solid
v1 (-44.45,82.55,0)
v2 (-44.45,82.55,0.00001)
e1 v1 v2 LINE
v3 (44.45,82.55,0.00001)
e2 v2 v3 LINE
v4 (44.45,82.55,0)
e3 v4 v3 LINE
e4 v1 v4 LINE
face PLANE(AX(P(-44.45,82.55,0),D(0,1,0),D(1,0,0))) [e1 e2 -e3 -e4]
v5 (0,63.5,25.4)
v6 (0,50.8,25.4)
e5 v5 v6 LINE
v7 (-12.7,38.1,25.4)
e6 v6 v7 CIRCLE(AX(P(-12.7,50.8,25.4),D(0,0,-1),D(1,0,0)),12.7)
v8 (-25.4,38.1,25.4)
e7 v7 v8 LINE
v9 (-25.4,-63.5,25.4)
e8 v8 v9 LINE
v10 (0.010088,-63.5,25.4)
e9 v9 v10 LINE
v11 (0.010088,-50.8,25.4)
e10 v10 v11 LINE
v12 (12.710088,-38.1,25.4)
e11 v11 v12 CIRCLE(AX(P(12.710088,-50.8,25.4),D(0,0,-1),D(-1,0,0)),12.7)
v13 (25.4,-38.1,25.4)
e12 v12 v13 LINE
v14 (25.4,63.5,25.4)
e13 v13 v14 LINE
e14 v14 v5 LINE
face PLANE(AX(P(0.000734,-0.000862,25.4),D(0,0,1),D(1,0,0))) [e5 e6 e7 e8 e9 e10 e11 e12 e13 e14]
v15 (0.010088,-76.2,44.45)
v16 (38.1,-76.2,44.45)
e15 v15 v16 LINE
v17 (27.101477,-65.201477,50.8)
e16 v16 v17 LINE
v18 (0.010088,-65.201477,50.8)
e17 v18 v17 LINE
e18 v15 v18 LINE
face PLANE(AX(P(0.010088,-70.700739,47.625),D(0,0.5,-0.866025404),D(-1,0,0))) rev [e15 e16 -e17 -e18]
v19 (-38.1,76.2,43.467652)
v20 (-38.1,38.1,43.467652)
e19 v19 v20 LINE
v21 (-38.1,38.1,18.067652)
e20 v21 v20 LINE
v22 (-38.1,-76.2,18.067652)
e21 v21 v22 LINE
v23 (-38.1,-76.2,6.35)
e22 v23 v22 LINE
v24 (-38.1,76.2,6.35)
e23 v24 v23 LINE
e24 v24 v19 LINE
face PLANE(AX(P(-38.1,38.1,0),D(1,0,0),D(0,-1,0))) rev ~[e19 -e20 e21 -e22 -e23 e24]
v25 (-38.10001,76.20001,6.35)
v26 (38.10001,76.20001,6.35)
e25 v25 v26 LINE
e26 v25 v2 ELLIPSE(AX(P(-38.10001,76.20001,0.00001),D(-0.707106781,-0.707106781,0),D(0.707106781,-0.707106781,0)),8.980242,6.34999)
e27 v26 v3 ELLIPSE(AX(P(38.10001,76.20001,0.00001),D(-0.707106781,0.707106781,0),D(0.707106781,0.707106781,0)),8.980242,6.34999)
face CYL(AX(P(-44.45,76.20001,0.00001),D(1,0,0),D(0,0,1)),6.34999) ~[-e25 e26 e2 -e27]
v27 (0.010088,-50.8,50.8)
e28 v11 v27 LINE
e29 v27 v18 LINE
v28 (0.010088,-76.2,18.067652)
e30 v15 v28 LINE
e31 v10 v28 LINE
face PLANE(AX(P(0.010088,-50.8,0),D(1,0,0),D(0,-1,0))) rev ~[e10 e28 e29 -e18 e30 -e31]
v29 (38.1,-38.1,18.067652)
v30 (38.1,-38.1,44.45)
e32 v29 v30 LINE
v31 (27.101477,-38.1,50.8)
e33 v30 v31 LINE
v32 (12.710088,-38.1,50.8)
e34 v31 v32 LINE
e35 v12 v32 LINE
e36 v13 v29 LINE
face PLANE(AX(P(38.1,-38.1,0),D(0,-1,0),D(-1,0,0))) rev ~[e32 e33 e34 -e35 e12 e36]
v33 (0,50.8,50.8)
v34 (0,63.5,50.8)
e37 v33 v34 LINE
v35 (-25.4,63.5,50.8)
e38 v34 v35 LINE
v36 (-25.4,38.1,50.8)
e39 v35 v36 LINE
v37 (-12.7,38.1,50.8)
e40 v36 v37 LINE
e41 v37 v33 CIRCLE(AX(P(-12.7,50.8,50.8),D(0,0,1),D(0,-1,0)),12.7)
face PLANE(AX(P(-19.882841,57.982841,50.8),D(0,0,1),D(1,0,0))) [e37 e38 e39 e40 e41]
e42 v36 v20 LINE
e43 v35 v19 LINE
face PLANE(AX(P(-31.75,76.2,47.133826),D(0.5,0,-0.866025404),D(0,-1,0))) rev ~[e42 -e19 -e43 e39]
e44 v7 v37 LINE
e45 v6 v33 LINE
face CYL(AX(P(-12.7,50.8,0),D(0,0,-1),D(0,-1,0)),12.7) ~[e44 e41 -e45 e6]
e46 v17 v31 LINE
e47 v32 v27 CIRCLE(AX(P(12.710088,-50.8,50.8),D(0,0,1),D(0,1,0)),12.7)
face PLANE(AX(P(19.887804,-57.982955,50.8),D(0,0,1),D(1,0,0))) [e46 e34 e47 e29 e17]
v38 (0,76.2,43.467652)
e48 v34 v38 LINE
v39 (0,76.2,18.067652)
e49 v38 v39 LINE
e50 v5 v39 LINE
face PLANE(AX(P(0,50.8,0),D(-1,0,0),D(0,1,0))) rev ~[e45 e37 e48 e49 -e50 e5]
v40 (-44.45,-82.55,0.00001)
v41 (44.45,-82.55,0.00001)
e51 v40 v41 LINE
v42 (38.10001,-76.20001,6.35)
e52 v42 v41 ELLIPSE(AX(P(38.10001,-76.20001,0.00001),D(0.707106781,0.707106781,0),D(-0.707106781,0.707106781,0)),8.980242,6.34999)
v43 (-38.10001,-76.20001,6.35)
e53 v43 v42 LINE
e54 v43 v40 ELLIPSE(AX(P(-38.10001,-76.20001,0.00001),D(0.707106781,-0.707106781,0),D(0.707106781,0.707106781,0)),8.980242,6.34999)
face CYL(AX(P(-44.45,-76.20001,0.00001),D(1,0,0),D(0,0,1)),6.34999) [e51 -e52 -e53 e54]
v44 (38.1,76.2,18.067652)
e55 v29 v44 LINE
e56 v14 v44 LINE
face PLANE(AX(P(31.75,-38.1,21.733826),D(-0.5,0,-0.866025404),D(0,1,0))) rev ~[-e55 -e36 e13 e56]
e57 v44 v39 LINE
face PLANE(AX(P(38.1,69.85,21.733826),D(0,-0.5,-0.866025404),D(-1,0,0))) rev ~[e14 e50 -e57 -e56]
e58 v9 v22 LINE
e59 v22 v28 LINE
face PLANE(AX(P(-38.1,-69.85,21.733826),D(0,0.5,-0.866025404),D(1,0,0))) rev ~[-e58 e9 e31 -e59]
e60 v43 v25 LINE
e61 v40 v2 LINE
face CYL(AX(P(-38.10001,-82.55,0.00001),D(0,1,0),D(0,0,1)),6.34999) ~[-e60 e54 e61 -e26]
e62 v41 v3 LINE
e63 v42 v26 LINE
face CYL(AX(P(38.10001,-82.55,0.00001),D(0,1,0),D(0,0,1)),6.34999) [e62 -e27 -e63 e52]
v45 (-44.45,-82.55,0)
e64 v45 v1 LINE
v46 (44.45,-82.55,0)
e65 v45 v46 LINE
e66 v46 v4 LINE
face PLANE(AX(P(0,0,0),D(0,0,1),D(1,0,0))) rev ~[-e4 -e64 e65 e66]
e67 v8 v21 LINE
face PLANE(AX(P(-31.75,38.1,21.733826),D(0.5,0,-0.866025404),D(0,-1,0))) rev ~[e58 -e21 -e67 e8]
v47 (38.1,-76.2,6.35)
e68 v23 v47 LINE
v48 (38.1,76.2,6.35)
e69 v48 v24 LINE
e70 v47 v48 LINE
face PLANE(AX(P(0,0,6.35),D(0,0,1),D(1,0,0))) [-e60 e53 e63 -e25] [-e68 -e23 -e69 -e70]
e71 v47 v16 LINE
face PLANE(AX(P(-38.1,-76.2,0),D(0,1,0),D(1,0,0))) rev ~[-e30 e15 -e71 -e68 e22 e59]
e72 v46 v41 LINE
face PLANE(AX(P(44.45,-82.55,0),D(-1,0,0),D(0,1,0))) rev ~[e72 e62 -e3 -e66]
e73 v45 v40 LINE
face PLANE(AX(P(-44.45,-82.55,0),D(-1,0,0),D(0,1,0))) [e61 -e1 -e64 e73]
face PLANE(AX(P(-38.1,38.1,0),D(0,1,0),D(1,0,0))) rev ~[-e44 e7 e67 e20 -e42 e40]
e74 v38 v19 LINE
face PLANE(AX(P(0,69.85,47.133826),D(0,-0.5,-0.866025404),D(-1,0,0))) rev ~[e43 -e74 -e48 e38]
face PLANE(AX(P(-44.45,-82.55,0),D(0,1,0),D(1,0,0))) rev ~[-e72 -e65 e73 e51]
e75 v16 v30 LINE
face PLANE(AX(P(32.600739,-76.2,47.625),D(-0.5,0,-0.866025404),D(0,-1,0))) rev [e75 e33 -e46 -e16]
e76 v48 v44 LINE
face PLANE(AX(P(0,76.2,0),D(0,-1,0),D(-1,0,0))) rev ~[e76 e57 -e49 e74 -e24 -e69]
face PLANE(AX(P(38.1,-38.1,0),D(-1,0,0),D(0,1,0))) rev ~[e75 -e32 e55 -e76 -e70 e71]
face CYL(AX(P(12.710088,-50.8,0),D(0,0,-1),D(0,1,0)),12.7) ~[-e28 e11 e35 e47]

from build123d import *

# Parameters (mm, degrees)
F1_DEPTH = 25.4
F0_W     = 88.9
F0_H     = 165.1
F2_DEPTH = 6.35
F3_DEPTH = 50.8
F4_R     = 6.34999
F5_SIZE2 = 7.3323484187
F5_SIZE  = 12.7
F6_SIZE2 = 7.3323484187
F6_SIZE  = 12.7
F7_SIZE2 = 10.9985226281
F7_SIZE  = 6.35


# Not quite as in the source:
# - a fillet or chamfer is up to 0.001 mm smaller than in the source, because OpenCascade refuses the exact size


with BuildPart() as f1:
    # F0 (on Top) → F1 (new body)
    with BuildSketch(Plane.XY):
        with BuildLine():
            Line((38.1, -38.1), (38.1, 76.2))
            Line((38.1, 76.2), (0, 76.2))
            Line((0, 76.2), (0, 50.8))
            ThreePointArc((0, 50.8), (-3.7197438789, 41.8197438789), (-12.7, 38.1))
            Line((-12.7, 38.1), (-38.1, 38.1))
            Line((-38.1, 38.1), (-38.1, -76.2))
            Line((-38.1, -76.2), (0.0100879326, -76.2))
            Line((0.0100879326, -76.2), (0.0100879326, -50.8))
            ThreePointArc((0.0100879326, -50.8), (3.7298318116, -41.8197438789), (12.7100879326, -38.1))
            Line((12.7100879326, -38.1), (38.1, -38.1))
        make_face()
    extrude(amount=F1_DEPTH)

    # F0 (on Top) → F2 (join)
    with BuildSketch(Plane.XY):
        Rectangle(F0_W, F0_H)
        Polygon((0, 76.2), (38.1, 76.2), (38.1, -38.1), (38.1, -76.2), (0.0100879326, -76.2), (-38.1, -76.2), (-38.1, 38.1), (-38.1, 76.2), align=None, mode=Mode.SUBTRACT)
    extrude(amount=F2_DEPTH)

    # F0 (on Top) → F3 (join)
    with BuildSketch(Plane.XY):
        with BuildLine():
            Line((0, 50.8), (0, 76.2))
            Line((0, 76.2), (-38.1, 76.2))
            Line((-38.1, 76.2), (-38.1, 38.1))
            Line((-38.1, 38.1), (-12.7, 38.1))
            ThreePointArc((-12.7, 38.1), (-3.7197438789, 41.8197438789), (0, 50.8))
        make_face()
        with BuildLine():
            Line((38.1, -76.2), (38.1, -38.1))
            Line((38.1, -38.1), (12.7100879326, -38.1))
            ThreePointArc((12.7100879326, -38.1), (3.7298318116, -41.8197438789), (0.0100879326, -50.8))
            Line((0.0100879326, -50.8), (0.0100879326, -76.2))
            Line((0.0100879326, -76.2), (38.1, -76.2))
        make_face()
    extrude(amount=F3_DEPTH)

    # F4 (radius 6.35 in the source; OpenCascade refuses exactly that, so slightly less here)
    f4_edges = [f1.edges().sort_by_distance(p)[0] for p in [
        (44.45, 0, 6.35),
        (0, 82.55, 6.35),
        (-44.45, 0, 6.35),
        (0, -82.55, 6.35),
    ]]
    fillet(f4_edges, radius=F4_R)

    # F5
    f5_edges = [f1.edges().sort_by_distance(p)[0] for p in [
        (-38.1, -19.05, 25.4),
        (-19.044956, -76.2, 25.4),
        (19.05, 76.2, 25.4),
        (38.1, 19.05, 25.4),
    ]]
    f5_side = f1.faces().sort_by_distance((4e-05, -0.002502, 25.4))[0]
    chamfer(f5_edges, length=F5_SIZE, length2=F5_SIZE2, reference=f5_side)

    # F6
    f6_edges = [f1.edges().sort_by_distance(p)[0] for p in [
        (-38.1, 57.15, 50.8),
        (-19.05, 76.2, 50.8),
    ]]
    f6_side = f1.faces().sort_by_distance((-19.446042, 57.546042, 50.8))[0]
    chamfer(f6_edges, length=F6_SIZE, length2=F6_SIZE2, reference=f6_side)

    # F7
    f7_edges = [f1.edges().sort_by_distance(p)[0] for p in [
        (38.1, -57.15, 50.8),
        (19.055044, -76.2, 50.8),
    ]]
    chamfer(f7_edges, length=F7_SIZE, length2=F7_SIZE2)


solid = f1.part
